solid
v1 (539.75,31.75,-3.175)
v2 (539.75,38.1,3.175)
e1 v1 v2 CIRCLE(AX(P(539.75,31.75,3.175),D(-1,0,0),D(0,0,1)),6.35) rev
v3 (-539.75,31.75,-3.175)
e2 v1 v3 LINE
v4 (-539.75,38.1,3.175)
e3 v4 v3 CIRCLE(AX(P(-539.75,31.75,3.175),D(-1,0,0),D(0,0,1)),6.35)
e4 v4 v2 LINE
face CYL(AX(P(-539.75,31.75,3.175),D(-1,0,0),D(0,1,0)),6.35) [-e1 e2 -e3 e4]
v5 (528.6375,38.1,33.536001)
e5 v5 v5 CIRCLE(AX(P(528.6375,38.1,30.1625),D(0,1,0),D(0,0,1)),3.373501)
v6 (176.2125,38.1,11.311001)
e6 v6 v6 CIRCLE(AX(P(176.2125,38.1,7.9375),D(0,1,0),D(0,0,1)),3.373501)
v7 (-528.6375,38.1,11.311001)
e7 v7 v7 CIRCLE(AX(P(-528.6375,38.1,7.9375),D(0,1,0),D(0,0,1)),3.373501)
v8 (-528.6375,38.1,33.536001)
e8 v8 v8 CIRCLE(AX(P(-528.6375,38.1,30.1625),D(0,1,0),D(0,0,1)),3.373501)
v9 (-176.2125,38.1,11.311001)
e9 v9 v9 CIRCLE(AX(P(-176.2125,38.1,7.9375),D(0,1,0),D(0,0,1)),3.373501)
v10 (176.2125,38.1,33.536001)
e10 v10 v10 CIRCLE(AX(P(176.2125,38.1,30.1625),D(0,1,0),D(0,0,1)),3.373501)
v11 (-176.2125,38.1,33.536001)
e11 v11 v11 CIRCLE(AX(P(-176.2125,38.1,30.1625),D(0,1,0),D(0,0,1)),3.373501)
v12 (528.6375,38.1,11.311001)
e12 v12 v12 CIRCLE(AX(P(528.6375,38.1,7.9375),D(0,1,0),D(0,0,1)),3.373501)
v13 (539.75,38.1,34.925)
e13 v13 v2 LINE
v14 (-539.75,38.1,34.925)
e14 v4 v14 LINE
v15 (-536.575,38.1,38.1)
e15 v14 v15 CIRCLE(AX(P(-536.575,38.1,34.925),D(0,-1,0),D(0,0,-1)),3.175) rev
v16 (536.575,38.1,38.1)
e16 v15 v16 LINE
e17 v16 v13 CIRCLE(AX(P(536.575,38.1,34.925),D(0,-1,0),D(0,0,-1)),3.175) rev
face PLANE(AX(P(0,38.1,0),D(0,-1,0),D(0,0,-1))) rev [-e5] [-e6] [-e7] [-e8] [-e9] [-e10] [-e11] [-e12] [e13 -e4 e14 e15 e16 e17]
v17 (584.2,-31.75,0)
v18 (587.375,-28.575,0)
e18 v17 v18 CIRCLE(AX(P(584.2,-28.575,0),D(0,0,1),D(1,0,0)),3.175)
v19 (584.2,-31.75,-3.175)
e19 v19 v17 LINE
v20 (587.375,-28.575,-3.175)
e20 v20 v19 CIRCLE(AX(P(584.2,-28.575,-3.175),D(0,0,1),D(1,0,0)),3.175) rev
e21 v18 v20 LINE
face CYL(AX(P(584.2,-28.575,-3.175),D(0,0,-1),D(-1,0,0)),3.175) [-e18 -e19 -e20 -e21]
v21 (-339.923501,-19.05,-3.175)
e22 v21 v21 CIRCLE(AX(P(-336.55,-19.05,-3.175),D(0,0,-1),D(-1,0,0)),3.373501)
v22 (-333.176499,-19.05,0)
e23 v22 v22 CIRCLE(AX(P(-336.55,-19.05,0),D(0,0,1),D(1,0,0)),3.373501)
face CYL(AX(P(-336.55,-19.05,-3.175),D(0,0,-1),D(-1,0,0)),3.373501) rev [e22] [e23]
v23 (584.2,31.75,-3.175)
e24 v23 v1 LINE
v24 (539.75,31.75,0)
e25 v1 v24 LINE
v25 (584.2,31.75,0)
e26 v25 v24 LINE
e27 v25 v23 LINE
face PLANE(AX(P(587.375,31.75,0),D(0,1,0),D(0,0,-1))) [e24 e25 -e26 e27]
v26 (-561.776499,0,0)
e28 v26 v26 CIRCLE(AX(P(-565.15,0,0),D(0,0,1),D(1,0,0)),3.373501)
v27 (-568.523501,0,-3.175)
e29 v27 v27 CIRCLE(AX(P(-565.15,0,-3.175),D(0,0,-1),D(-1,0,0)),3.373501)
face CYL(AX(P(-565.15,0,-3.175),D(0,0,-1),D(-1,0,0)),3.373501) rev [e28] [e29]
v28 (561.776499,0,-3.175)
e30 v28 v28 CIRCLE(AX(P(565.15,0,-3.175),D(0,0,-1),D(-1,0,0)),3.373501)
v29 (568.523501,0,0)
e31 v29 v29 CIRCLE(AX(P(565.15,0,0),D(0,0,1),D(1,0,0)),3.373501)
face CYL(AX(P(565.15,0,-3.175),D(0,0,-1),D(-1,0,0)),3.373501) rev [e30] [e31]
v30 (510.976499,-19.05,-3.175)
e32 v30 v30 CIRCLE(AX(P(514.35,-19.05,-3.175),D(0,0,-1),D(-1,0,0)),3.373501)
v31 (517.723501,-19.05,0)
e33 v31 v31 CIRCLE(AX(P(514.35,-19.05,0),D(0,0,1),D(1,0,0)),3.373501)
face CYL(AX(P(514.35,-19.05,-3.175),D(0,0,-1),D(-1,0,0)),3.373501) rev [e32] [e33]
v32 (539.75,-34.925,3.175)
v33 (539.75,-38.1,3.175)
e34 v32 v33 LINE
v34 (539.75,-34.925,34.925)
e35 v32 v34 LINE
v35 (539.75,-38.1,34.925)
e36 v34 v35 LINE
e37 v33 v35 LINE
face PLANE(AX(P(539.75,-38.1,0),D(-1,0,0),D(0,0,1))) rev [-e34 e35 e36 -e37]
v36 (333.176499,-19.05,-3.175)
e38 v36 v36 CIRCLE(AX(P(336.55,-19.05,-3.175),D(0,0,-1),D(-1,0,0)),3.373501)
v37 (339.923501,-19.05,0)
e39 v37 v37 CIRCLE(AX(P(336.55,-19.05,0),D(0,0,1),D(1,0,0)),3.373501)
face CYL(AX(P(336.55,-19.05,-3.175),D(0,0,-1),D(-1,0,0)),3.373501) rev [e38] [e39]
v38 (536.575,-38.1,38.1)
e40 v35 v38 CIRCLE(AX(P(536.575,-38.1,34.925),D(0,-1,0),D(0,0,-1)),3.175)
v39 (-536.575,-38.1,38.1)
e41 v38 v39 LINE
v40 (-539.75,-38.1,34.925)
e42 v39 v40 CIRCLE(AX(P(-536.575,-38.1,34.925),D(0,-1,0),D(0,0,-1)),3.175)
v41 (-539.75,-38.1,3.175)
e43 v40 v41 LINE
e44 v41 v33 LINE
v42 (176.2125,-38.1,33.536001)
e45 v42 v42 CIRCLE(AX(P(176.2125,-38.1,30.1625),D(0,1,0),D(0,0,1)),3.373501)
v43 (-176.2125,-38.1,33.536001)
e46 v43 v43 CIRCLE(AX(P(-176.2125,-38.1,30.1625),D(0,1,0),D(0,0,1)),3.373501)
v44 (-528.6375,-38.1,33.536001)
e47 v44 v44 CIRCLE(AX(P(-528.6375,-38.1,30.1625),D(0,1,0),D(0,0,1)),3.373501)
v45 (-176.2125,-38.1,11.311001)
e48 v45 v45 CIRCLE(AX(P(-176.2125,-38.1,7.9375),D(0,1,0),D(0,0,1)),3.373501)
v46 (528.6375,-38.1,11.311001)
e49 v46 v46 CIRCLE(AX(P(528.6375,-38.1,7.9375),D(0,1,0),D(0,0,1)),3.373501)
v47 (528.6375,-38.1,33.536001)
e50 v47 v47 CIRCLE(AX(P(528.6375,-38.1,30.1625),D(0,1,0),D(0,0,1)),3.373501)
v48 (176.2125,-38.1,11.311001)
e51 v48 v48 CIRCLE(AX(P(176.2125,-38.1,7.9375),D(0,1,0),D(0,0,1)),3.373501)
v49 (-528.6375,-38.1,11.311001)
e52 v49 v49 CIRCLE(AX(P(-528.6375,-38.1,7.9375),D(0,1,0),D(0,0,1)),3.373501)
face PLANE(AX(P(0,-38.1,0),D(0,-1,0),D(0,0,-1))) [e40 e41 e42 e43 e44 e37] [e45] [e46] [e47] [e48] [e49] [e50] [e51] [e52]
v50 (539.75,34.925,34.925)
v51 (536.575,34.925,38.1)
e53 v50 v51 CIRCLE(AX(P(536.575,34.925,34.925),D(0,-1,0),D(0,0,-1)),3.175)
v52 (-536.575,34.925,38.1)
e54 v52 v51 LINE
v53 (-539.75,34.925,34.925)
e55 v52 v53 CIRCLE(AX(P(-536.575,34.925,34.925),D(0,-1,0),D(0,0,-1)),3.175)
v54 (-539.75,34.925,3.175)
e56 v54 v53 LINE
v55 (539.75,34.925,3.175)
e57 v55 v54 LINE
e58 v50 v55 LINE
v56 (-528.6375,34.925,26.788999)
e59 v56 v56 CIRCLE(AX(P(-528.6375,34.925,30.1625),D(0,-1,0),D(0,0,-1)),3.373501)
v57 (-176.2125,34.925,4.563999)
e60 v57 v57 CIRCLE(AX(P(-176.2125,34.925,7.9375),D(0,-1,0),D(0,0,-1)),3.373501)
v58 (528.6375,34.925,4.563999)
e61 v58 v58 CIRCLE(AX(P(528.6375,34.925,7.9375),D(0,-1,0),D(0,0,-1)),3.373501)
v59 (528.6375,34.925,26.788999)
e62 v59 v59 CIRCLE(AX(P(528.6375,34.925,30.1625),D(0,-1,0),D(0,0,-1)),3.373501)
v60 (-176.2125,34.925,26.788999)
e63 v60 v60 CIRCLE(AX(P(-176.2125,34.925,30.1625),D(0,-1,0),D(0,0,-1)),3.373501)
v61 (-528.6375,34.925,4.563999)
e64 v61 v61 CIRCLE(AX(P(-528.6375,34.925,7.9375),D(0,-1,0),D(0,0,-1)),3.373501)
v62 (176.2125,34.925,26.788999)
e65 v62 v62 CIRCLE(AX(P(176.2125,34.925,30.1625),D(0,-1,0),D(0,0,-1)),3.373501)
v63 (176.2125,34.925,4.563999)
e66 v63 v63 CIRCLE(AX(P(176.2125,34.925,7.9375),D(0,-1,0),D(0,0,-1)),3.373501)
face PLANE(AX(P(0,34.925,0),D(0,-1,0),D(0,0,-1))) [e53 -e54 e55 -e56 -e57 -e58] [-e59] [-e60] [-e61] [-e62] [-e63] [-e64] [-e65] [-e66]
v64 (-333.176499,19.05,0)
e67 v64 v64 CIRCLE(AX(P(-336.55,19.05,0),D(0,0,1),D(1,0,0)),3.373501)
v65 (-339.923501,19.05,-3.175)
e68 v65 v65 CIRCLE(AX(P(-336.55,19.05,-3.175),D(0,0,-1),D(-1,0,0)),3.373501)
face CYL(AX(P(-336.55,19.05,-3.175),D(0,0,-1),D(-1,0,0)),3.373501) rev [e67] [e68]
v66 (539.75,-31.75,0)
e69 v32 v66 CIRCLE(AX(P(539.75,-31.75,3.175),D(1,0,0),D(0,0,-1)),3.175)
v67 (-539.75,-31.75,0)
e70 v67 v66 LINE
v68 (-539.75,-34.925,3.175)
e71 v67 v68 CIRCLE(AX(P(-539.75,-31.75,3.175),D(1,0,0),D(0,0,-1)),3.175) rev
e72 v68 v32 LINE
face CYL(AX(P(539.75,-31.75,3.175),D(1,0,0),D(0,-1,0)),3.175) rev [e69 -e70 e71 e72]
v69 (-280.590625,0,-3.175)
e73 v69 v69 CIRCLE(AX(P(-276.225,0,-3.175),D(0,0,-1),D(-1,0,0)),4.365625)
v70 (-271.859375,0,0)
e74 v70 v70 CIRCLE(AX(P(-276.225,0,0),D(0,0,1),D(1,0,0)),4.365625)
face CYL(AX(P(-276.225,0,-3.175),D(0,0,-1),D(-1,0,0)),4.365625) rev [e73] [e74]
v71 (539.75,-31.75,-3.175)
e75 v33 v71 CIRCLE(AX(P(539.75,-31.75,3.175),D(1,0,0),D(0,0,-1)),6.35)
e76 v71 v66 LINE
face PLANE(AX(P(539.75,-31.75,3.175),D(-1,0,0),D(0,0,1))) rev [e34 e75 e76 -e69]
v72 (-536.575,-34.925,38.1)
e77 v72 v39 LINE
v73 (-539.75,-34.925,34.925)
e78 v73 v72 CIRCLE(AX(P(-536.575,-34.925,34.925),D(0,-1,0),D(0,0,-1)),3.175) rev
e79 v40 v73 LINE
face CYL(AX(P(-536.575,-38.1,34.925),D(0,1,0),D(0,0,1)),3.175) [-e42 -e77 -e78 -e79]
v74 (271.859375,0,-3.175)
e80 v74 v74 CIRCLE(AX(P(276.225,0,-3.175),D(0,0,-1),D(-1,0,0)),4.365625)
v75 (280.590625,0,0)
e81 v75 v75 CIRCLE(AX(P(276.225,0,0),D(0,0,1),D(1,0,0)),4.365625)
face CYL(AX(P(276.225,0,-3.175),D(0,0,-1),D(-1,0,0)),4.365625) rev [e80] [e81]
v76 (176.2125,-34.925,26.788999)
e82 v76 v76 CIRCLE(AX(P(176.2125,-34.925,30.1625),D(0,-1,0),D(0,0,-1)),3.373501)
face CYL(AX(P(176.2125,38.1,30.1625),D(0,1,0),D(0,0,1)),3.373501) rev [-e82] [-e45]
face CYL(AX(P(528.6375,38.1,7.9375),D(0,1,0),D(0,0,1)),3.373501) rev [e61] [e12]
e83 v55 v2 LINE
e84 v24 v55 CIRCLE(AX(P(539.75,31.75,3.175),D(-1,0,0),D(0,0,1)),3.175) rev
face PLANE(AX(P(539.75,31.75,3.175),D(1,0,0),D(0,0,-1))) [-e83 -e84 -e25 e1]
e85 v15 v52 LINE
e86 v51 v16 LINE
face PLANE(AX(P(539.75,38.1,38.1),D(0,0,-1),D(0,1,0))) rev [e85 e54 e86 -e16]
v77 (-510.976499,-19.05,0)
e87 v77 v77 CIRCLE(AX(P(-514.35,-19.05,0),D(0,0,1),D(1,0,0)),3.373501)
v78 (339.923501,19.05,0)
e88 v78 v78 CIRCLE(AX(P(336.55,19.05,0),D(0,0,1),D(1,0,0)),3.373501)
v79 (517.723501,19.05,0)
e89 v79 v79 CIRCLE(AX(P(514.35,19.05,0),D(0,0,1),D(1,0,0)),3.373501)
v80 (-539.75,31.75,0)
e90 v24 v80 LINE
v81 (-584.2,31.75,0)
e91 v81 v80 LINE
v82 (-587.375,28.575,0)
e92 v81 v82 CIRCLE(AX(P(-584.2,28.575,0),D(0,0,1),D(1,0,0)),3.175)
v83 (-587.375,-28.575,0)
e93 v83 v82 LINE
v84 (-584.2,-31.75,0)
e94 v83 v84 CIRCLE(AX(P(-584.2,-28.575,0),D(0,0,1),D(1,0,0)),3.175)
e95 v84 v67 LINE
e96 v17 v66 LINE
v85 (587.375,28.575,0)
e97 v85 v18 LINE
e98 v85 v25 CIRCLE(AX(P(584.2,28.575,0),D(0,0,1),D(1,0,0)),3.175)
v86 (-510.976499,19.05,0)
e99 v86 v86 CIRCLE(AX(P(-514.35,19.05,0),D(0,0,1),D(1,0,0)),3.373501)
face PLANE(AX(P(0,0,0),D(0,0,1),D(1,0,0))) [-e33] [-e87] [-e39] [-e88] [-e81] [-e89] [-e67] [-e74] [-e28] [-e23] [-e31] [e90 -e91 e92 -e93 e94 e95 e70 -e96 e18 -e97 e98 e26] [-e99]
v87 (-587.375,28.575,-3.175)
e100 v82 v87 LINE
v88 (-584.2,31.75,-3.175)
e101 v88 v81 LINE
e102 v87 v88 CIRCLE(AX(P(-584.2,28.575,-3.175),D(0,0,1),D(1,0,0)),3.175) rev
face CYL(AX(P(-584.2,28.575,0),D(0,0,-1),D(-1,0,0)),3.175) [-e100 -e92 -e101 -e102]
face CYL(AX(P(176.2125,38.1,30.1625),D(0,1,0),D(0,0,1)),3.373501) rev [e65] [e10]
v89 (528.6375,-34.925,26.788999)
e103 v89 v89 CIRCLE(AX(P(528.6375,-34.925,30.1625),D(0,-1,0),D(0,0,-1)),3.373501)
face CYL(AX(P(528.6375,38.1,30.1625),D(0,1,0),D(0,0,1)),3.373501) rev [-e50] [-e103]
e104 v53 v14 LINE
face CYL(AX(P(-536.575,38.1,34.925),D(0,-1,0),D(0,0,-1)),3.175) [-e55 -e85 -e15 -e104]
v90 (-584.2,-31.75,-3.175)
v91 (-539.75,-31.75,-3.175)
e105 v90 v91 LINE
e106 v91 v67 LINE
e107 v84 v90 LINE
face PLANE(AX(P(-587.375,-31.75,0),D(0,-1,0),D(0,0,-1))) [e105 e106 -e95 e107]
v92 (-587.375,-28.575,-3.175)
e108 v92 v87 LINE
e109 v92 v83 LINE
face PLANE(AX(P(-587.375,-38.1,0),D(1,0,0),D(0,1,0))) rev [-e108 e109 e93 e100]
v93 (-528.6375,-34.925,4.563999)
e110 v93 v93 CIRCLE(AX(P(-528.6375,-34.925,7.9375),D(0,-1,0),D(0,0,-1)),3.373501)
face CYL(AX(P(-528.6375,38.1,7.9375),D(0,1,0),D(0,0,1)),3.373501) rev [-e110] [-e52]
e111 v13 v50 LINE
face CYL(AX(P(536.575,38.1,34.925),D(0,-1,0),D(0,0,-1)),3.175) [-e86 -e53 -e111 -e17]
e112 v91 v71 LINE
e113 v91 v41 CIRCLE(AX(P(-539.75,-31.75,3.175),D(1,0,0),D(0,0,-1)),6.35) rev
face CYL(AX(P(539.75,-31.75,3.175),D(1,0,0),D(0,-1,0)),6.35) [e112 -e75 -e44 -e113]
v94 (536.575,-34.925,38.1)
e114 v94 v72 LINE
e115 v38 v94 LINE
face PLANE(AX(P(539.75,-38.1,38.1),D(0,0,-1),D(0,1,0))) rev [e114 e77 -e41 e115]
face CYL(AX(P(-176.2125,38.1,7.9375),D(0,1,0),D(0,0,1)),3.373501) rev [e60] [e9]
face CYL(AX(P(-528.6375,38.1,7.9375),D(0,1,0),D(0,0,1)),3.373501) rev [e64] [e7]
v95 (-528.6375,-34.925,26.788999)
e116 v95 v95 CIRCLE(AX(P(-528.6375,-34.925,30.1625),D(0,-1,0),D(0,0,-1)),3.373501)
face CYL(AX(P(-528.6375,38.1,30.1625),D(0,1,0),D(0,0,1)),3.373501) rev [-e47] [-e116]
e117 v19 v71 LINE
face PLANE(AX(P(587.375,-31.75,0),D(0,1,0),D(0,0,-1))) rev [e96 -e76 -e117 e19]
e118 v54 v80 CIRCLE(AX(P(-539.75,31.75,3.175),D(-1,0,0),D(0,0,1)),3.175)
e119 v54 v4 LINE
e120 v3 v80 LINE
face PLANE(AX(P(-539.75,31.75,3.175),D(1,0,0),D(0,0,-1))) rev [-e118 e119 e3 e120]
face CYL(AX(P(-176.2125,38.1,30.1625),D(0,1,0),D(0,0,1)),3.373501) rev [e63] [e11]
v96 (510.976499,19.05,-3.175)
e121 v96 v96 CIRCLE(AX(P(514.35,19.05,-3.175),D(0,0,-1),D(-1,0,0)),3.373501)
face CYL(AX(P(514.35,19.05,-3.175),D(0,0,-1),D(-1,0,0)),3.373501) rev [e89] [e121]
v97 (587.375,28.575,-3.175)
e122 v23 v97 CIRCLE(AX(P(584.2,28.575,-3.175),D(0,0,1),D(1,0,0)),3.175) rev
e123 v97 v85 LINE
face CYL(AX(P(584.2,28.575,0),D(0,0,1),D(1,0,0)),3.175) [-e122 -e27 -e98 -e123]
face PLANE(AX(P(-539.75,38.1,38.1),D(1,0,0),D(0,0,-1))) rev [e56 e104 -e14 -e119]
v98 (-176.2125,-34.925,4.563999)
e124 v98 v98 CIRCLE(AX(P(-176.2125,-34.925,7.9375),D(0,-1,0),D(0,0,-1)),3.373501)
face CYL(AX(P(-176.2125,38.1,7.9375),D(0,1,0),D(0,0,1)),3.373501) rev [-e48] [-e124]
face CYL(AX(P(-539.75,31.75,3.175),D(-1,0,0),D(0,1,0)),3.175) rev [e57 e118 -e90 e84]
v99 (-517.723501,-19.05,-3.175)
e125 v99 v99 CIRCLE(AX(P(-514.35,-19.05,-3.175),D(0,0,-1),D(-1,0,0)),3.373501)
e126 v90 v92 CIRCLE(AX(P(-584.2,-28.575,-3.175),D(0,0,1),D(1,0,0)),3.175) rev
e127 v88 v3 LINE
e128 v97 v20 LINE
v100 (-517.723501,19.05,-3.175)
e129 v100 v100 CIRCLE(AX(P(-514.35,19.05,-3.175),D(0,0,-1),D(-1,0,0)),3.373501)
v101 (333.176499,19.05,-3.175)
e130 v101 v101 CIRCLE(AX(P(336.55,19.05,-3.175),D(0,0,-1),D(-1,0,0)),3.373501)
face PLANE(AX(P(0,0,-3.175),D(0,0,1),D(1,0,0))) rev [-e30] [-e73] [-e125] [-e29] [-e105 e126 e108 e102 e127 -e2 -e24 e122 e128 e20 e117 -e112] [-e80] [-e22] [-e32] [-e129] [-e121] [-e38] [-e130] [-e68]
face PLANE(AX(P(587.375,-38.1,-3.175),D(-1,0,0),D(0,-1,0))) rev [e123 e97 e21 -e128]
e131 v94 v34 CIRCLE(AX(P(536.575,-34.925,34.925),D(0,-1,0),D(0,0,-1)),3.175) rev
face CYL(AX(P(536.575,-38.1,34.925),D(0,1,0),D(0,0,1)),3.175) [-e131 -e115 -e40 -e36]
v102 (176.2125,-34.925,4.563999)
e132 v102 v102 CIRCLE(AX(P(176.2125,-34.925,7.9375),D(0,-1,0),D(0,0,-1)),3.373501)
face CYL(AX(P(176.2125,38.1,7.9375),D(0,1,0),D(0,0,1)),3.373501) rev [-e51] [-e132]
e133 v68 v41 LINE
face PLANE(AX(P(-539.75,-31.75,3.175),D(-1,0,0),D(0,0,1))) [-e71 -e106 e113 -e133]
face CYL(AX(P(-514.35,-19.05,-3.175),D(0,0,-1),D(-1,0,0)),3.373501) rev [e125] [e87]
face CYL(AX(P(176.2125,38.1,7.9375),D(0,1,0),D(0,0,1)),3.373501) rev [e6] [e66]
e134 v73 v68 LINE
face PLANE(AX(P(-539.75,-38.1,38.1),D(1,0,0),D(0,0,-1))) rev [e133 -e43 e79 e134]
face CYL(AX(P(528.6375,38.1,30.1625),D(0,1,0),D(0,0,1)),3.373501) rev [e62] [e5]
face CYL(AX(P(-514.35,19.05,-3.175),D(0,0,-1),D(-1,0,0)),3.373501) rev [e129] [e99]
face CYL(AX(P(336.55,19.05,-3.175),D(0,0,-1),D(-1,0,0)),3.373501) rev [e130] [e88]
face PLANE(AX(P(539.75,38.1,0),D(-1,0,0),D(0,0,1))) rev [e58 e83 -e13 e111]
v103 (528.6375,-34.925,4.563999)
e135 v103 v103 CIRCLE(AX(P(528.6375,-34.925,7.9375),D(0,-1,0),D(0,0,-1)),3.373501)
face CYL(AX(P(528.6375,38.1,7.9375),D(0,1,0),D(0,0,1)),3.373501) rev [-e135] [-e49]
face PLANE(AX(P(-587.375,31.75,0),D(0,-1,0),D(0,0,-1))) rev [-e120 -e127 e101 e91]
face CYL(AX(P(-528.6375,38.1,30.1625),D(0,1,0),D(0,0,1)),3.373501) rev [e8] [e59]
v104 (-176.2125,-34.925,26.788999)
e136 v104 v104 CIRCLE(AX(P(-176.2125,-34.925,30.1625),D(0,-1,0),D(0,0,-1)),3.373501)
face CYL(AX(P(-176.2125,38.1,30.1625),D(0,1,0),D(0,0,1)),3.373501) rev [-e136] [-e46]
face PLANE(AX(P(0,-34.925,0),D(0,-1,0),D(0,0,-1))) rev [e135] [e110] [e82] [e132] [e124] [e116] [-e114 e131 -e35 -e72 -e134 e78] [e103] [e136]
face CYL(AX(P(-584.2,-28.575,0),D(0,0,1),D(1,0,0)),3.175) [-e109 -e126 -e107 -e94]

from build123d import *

# Parameters (mm, degrees)
SKETCH1_W                        = 1079.5
SKETCH1_H                        = 63.5
BASE_FLANGE1_DEPTH               = 3.175
EDGE_FLANGE4_DEPTH               = 1079.5
EDGE_FLANGE4_BEND_DEPTH          = 1079.5
EDGE_FLANGE1_DEPTH               = 63.5
EDGE_FLANGE1_BEND_DEPTH          = 63.5
F_17_64_0_26563_DIAMETER_HOLE1_D = 6.747002
F_11_32_0_34375_DIAMETER_HOLE1_D = 8.73125
CUT_EXTRUDE1_DEPTH               = 600.469933045
FILLET1_R                        = 3.175
F_17_64_0_26563_DIAMETER_HOLE2_D = 6.747002
F_17_64_0_26563_DIAMETER_HOLE3_D = 6.747002


# Sheet-metal steps are written as plain solids
with BuildPart() as part:
    # Sketch1 → Base-Flange1 (new body)
    with BuildSketch(Plane.XY):
        Rectangle(SKETCH1_W, SKETCH1_H)
    extrude(amount=-BASE_FLANGE1_DEPTH)

    # Edge-Flange4 section (across the edge) → Edge-Flange4 (add)
    with BuildSketch(Plane(origin=(-539.75, -34.925, 0), x_dir=(0, 1, 0), z_dir=(1, 0, 0))):
        with BuildLine():
            Line((-3.175, 3.175), (-3.175, 38.1))
            Line((-3.175, 38.1), (0, 38.1))
            Line((0, 38.1), (0, 3.175))
            ThreePointArc((0, 3.175), (0.92993597, 0.92993597), (3.175, 0))
            Line((3.175, 0), (3.175, -3.175))
            ThreePointArc((3.175, -3.175), (-1.315128061, -1.315128061), (-3.175, 3.175))
        make_face()
    extrude(amount=EDGE_FLANGE4_DEPTH)

    # Edge-Flange4 section 2 (across the edge) → Edge-Flange4 bend (add)
    with BuildSketch(Plane(origin=(539.75, 34.925, 0), x_dir=(0, -1, 0), z_dir=(-1, 0, 0))):
        with BuildLine():
            Line((-3.175, 3.175), (-3.175, 38.1))
            Line((-3.175, 38.1), (0, 38.1))
            Line((0, 38.1), (0, 3.175))
            ThreePointArc((0, 3.175), (0.92993597, 0.92993597), (3.175, 0))
            Line((3.175, 0), (3.175, -3.175))
            ThreePointArc((3.175, -3.175), (-1.315128061, -1.315128061), (-3.175, 3.175))
        make_face()
    extrude(amount=EDGE_FLANGE4_BEND_DEPTH)

    # Edge-Flange1 section (across the edge) → Edge-Flange1 (add)
    with BuildSketch(Plane(origin=(-590.55, 31.75, 0), x_dir=(1, 0, 0), z_dir=(0, -1, 0))):
        with BuildLine():
            Line((-3.175, 3.175), (-3.175, 44.45))
            Line((-3.175, 44.45), (0, 44.45))
            Line((0, 44.45), (0, 3.175))
            ThreePointArc((0, 3.175), (0.92993597, 0.92993597), (3.175, 0))
            Line((3.175, 0), (50.8, 0))
            Line((50.8, 0), (50.8, -3.175))
            Line((50.8, -3.175), (3.175, -3.175))
            ThreePointArc((3.175, -3.175), (-1.315128061, -1.315128061), (-3.175, 3.175))
        make_face()
    extrude(amount=EDGE_FLANGE1_DEPTH)

    # Edge-Flange1 section 2 (across the edge) → Edge-Flange1 bend (add)
    with BuildSketch(Plane(origin=(590.55, -31.75, 0), x_dir=(-1, 0, 0), z_dir=(0, 1, 0))):
        with BuildLine():
            Line((-3.175, 3.175), (-3.175, 44.45))
            Line((-3.175, 44.45), (0, 44.45))
            Line((0, 44.45), (0, 3.175))
            ThreePointArc((0, 3.175), (0.92993597, 0.92993597), (3.175, 0))
            Line((3.175, 0), (50.8, 0))
            Line((50.8, 0), (50.8, -3.175))
            Line((50.8, -3.175), (3.175, -3.175))
            ThreePointArc((3.175, -3.175), (-1.315128061, -1.315128061), (-3.175, 3.175))
        make_face()
    extrude(amount=EDGE_FLANGE1_BEND_DEPTH)

    # 17/64 (0.26563) Diameter Hole1 (through all)
    with Locations(Plane(origin=(0, 0, -3.175), x_dir=(-1, 0, 0), z_dir=(0, 0, -1))):
        with Locations((-565.15, 0), (565.15, 0)):
            Hole(F_17_64_0_26563_DIAMETER_HOLE1_D / 2)

    # 11/32 (0.34375) Diameter Hole1 (through all)
    with Locations(Plane(origin=(0, 0, -3.175), x_dir=(-1, 0, 0), z_dir=(0, 0, -1))):
        with Locations((-276.225, 0), (276.225, 0)):
            Hole(F_11_32_0_34375_DIAMETER_HOLE1_D / 2)

    # Sketch50 → Cut-Extrude1 (cut, through all)
    with BuildSketch(Plane(origin=(0, 31.75, 0), x_dir=(1, 0, 0), z_dir=(0, 1, 0))):
        with BuildLine():
            Line((590.55, -3.175), (590.55, -44.45))
            Line((590.55, -44.45), (593.725, -44.45))
            Line((593.725, -44.45), (593.725, -3.175))
            ThreePointArc((593.725, -3.175), (591.865128061, 1.315128061), (587.375, 3.175))
            Line((587.375, 3.175), (587.375, 0))
            ThreePointArc((587.375, 0), (589.62006403, -0.92993597), (590.55, -3.175))
        make_face()
        with BuildLine():
            Line((-593.725, -3.175), (-593.725, -44.45))
            Line((-593.725, -44.45), (-590.55, -44.45))
            Line((-590.55, -44.45), (-590.55, -3.175))
            ThreePointArc((-590.55, -3.175), (-589.62006403, -0.92993597), (-587.375, 0))
            Line((-587.375, 0), (-587.375, 3.175))
            ThreePointArc((-587.375, 3.175), (-591.865128061, 1.315128061), (-593.725, -3.175))
        make_face()
    extrude(amount=-CUT_EXTRUDE1_DEPTH, mode=Mode.SUBTRACT)

    # Fillet1
    fillet1_edges = [part.edges().sort_by_distance(p)[0] for p in [
        (-539.75, -36.5125, 38.1),
        (539.75, -36.5125, 38.1),
        (539.75, 36.5125, 38.1),
        (-539.75, 36.5125, 38.1),
        (-587.375, 31.75, -1.5875),
        (-587.375, -31.75, -1.5875),
        (587.375, -31.75, -1.5875),
        (587.375, 31.75, -1.5875),
    ]]
    fillet(fillet1_edges, radius=FILLET1_R)

    # 17/64 (0.26563) Diameter Hole2 (through all)
    with Locations(Plane(origin=(0, 38.1, 0), x_dir=(1, 0, 0), z_dir=(0, 1, 0))):
        with Locations((-528.6375, -7.9375), (-528.6375, -30.1625), (-176.2125, -30.1625), (-176.2125, -7.9375), (176.2125, -7.9375), (176.2125, -30.1625), (528.6375, -7.9375), (528.6375, -30.1625)):
            Hole(F_17_64_0_26563_DIAMETER_HOLE2_D / 2)

    # 17/64 (0.26563) Diameter Hole3 (through all)
    with Locations(Plane(origin=(0, 0, -3.175), x_dir=(-1, 0, 0), z_dir=(0, 0, -1))):
        with Locations((-514.35, 19.05), (-514.35, -19.05), (-336.55, 19.05), (-336.55, -19.05), (336.55, 19.05), (336.55, -19.05), (514.35, 19.05), (514.35, -19.05)):
            Hole(F_17_64_0_26563_DIAMETER_HOLE3_D / 2)


solid = part.part
